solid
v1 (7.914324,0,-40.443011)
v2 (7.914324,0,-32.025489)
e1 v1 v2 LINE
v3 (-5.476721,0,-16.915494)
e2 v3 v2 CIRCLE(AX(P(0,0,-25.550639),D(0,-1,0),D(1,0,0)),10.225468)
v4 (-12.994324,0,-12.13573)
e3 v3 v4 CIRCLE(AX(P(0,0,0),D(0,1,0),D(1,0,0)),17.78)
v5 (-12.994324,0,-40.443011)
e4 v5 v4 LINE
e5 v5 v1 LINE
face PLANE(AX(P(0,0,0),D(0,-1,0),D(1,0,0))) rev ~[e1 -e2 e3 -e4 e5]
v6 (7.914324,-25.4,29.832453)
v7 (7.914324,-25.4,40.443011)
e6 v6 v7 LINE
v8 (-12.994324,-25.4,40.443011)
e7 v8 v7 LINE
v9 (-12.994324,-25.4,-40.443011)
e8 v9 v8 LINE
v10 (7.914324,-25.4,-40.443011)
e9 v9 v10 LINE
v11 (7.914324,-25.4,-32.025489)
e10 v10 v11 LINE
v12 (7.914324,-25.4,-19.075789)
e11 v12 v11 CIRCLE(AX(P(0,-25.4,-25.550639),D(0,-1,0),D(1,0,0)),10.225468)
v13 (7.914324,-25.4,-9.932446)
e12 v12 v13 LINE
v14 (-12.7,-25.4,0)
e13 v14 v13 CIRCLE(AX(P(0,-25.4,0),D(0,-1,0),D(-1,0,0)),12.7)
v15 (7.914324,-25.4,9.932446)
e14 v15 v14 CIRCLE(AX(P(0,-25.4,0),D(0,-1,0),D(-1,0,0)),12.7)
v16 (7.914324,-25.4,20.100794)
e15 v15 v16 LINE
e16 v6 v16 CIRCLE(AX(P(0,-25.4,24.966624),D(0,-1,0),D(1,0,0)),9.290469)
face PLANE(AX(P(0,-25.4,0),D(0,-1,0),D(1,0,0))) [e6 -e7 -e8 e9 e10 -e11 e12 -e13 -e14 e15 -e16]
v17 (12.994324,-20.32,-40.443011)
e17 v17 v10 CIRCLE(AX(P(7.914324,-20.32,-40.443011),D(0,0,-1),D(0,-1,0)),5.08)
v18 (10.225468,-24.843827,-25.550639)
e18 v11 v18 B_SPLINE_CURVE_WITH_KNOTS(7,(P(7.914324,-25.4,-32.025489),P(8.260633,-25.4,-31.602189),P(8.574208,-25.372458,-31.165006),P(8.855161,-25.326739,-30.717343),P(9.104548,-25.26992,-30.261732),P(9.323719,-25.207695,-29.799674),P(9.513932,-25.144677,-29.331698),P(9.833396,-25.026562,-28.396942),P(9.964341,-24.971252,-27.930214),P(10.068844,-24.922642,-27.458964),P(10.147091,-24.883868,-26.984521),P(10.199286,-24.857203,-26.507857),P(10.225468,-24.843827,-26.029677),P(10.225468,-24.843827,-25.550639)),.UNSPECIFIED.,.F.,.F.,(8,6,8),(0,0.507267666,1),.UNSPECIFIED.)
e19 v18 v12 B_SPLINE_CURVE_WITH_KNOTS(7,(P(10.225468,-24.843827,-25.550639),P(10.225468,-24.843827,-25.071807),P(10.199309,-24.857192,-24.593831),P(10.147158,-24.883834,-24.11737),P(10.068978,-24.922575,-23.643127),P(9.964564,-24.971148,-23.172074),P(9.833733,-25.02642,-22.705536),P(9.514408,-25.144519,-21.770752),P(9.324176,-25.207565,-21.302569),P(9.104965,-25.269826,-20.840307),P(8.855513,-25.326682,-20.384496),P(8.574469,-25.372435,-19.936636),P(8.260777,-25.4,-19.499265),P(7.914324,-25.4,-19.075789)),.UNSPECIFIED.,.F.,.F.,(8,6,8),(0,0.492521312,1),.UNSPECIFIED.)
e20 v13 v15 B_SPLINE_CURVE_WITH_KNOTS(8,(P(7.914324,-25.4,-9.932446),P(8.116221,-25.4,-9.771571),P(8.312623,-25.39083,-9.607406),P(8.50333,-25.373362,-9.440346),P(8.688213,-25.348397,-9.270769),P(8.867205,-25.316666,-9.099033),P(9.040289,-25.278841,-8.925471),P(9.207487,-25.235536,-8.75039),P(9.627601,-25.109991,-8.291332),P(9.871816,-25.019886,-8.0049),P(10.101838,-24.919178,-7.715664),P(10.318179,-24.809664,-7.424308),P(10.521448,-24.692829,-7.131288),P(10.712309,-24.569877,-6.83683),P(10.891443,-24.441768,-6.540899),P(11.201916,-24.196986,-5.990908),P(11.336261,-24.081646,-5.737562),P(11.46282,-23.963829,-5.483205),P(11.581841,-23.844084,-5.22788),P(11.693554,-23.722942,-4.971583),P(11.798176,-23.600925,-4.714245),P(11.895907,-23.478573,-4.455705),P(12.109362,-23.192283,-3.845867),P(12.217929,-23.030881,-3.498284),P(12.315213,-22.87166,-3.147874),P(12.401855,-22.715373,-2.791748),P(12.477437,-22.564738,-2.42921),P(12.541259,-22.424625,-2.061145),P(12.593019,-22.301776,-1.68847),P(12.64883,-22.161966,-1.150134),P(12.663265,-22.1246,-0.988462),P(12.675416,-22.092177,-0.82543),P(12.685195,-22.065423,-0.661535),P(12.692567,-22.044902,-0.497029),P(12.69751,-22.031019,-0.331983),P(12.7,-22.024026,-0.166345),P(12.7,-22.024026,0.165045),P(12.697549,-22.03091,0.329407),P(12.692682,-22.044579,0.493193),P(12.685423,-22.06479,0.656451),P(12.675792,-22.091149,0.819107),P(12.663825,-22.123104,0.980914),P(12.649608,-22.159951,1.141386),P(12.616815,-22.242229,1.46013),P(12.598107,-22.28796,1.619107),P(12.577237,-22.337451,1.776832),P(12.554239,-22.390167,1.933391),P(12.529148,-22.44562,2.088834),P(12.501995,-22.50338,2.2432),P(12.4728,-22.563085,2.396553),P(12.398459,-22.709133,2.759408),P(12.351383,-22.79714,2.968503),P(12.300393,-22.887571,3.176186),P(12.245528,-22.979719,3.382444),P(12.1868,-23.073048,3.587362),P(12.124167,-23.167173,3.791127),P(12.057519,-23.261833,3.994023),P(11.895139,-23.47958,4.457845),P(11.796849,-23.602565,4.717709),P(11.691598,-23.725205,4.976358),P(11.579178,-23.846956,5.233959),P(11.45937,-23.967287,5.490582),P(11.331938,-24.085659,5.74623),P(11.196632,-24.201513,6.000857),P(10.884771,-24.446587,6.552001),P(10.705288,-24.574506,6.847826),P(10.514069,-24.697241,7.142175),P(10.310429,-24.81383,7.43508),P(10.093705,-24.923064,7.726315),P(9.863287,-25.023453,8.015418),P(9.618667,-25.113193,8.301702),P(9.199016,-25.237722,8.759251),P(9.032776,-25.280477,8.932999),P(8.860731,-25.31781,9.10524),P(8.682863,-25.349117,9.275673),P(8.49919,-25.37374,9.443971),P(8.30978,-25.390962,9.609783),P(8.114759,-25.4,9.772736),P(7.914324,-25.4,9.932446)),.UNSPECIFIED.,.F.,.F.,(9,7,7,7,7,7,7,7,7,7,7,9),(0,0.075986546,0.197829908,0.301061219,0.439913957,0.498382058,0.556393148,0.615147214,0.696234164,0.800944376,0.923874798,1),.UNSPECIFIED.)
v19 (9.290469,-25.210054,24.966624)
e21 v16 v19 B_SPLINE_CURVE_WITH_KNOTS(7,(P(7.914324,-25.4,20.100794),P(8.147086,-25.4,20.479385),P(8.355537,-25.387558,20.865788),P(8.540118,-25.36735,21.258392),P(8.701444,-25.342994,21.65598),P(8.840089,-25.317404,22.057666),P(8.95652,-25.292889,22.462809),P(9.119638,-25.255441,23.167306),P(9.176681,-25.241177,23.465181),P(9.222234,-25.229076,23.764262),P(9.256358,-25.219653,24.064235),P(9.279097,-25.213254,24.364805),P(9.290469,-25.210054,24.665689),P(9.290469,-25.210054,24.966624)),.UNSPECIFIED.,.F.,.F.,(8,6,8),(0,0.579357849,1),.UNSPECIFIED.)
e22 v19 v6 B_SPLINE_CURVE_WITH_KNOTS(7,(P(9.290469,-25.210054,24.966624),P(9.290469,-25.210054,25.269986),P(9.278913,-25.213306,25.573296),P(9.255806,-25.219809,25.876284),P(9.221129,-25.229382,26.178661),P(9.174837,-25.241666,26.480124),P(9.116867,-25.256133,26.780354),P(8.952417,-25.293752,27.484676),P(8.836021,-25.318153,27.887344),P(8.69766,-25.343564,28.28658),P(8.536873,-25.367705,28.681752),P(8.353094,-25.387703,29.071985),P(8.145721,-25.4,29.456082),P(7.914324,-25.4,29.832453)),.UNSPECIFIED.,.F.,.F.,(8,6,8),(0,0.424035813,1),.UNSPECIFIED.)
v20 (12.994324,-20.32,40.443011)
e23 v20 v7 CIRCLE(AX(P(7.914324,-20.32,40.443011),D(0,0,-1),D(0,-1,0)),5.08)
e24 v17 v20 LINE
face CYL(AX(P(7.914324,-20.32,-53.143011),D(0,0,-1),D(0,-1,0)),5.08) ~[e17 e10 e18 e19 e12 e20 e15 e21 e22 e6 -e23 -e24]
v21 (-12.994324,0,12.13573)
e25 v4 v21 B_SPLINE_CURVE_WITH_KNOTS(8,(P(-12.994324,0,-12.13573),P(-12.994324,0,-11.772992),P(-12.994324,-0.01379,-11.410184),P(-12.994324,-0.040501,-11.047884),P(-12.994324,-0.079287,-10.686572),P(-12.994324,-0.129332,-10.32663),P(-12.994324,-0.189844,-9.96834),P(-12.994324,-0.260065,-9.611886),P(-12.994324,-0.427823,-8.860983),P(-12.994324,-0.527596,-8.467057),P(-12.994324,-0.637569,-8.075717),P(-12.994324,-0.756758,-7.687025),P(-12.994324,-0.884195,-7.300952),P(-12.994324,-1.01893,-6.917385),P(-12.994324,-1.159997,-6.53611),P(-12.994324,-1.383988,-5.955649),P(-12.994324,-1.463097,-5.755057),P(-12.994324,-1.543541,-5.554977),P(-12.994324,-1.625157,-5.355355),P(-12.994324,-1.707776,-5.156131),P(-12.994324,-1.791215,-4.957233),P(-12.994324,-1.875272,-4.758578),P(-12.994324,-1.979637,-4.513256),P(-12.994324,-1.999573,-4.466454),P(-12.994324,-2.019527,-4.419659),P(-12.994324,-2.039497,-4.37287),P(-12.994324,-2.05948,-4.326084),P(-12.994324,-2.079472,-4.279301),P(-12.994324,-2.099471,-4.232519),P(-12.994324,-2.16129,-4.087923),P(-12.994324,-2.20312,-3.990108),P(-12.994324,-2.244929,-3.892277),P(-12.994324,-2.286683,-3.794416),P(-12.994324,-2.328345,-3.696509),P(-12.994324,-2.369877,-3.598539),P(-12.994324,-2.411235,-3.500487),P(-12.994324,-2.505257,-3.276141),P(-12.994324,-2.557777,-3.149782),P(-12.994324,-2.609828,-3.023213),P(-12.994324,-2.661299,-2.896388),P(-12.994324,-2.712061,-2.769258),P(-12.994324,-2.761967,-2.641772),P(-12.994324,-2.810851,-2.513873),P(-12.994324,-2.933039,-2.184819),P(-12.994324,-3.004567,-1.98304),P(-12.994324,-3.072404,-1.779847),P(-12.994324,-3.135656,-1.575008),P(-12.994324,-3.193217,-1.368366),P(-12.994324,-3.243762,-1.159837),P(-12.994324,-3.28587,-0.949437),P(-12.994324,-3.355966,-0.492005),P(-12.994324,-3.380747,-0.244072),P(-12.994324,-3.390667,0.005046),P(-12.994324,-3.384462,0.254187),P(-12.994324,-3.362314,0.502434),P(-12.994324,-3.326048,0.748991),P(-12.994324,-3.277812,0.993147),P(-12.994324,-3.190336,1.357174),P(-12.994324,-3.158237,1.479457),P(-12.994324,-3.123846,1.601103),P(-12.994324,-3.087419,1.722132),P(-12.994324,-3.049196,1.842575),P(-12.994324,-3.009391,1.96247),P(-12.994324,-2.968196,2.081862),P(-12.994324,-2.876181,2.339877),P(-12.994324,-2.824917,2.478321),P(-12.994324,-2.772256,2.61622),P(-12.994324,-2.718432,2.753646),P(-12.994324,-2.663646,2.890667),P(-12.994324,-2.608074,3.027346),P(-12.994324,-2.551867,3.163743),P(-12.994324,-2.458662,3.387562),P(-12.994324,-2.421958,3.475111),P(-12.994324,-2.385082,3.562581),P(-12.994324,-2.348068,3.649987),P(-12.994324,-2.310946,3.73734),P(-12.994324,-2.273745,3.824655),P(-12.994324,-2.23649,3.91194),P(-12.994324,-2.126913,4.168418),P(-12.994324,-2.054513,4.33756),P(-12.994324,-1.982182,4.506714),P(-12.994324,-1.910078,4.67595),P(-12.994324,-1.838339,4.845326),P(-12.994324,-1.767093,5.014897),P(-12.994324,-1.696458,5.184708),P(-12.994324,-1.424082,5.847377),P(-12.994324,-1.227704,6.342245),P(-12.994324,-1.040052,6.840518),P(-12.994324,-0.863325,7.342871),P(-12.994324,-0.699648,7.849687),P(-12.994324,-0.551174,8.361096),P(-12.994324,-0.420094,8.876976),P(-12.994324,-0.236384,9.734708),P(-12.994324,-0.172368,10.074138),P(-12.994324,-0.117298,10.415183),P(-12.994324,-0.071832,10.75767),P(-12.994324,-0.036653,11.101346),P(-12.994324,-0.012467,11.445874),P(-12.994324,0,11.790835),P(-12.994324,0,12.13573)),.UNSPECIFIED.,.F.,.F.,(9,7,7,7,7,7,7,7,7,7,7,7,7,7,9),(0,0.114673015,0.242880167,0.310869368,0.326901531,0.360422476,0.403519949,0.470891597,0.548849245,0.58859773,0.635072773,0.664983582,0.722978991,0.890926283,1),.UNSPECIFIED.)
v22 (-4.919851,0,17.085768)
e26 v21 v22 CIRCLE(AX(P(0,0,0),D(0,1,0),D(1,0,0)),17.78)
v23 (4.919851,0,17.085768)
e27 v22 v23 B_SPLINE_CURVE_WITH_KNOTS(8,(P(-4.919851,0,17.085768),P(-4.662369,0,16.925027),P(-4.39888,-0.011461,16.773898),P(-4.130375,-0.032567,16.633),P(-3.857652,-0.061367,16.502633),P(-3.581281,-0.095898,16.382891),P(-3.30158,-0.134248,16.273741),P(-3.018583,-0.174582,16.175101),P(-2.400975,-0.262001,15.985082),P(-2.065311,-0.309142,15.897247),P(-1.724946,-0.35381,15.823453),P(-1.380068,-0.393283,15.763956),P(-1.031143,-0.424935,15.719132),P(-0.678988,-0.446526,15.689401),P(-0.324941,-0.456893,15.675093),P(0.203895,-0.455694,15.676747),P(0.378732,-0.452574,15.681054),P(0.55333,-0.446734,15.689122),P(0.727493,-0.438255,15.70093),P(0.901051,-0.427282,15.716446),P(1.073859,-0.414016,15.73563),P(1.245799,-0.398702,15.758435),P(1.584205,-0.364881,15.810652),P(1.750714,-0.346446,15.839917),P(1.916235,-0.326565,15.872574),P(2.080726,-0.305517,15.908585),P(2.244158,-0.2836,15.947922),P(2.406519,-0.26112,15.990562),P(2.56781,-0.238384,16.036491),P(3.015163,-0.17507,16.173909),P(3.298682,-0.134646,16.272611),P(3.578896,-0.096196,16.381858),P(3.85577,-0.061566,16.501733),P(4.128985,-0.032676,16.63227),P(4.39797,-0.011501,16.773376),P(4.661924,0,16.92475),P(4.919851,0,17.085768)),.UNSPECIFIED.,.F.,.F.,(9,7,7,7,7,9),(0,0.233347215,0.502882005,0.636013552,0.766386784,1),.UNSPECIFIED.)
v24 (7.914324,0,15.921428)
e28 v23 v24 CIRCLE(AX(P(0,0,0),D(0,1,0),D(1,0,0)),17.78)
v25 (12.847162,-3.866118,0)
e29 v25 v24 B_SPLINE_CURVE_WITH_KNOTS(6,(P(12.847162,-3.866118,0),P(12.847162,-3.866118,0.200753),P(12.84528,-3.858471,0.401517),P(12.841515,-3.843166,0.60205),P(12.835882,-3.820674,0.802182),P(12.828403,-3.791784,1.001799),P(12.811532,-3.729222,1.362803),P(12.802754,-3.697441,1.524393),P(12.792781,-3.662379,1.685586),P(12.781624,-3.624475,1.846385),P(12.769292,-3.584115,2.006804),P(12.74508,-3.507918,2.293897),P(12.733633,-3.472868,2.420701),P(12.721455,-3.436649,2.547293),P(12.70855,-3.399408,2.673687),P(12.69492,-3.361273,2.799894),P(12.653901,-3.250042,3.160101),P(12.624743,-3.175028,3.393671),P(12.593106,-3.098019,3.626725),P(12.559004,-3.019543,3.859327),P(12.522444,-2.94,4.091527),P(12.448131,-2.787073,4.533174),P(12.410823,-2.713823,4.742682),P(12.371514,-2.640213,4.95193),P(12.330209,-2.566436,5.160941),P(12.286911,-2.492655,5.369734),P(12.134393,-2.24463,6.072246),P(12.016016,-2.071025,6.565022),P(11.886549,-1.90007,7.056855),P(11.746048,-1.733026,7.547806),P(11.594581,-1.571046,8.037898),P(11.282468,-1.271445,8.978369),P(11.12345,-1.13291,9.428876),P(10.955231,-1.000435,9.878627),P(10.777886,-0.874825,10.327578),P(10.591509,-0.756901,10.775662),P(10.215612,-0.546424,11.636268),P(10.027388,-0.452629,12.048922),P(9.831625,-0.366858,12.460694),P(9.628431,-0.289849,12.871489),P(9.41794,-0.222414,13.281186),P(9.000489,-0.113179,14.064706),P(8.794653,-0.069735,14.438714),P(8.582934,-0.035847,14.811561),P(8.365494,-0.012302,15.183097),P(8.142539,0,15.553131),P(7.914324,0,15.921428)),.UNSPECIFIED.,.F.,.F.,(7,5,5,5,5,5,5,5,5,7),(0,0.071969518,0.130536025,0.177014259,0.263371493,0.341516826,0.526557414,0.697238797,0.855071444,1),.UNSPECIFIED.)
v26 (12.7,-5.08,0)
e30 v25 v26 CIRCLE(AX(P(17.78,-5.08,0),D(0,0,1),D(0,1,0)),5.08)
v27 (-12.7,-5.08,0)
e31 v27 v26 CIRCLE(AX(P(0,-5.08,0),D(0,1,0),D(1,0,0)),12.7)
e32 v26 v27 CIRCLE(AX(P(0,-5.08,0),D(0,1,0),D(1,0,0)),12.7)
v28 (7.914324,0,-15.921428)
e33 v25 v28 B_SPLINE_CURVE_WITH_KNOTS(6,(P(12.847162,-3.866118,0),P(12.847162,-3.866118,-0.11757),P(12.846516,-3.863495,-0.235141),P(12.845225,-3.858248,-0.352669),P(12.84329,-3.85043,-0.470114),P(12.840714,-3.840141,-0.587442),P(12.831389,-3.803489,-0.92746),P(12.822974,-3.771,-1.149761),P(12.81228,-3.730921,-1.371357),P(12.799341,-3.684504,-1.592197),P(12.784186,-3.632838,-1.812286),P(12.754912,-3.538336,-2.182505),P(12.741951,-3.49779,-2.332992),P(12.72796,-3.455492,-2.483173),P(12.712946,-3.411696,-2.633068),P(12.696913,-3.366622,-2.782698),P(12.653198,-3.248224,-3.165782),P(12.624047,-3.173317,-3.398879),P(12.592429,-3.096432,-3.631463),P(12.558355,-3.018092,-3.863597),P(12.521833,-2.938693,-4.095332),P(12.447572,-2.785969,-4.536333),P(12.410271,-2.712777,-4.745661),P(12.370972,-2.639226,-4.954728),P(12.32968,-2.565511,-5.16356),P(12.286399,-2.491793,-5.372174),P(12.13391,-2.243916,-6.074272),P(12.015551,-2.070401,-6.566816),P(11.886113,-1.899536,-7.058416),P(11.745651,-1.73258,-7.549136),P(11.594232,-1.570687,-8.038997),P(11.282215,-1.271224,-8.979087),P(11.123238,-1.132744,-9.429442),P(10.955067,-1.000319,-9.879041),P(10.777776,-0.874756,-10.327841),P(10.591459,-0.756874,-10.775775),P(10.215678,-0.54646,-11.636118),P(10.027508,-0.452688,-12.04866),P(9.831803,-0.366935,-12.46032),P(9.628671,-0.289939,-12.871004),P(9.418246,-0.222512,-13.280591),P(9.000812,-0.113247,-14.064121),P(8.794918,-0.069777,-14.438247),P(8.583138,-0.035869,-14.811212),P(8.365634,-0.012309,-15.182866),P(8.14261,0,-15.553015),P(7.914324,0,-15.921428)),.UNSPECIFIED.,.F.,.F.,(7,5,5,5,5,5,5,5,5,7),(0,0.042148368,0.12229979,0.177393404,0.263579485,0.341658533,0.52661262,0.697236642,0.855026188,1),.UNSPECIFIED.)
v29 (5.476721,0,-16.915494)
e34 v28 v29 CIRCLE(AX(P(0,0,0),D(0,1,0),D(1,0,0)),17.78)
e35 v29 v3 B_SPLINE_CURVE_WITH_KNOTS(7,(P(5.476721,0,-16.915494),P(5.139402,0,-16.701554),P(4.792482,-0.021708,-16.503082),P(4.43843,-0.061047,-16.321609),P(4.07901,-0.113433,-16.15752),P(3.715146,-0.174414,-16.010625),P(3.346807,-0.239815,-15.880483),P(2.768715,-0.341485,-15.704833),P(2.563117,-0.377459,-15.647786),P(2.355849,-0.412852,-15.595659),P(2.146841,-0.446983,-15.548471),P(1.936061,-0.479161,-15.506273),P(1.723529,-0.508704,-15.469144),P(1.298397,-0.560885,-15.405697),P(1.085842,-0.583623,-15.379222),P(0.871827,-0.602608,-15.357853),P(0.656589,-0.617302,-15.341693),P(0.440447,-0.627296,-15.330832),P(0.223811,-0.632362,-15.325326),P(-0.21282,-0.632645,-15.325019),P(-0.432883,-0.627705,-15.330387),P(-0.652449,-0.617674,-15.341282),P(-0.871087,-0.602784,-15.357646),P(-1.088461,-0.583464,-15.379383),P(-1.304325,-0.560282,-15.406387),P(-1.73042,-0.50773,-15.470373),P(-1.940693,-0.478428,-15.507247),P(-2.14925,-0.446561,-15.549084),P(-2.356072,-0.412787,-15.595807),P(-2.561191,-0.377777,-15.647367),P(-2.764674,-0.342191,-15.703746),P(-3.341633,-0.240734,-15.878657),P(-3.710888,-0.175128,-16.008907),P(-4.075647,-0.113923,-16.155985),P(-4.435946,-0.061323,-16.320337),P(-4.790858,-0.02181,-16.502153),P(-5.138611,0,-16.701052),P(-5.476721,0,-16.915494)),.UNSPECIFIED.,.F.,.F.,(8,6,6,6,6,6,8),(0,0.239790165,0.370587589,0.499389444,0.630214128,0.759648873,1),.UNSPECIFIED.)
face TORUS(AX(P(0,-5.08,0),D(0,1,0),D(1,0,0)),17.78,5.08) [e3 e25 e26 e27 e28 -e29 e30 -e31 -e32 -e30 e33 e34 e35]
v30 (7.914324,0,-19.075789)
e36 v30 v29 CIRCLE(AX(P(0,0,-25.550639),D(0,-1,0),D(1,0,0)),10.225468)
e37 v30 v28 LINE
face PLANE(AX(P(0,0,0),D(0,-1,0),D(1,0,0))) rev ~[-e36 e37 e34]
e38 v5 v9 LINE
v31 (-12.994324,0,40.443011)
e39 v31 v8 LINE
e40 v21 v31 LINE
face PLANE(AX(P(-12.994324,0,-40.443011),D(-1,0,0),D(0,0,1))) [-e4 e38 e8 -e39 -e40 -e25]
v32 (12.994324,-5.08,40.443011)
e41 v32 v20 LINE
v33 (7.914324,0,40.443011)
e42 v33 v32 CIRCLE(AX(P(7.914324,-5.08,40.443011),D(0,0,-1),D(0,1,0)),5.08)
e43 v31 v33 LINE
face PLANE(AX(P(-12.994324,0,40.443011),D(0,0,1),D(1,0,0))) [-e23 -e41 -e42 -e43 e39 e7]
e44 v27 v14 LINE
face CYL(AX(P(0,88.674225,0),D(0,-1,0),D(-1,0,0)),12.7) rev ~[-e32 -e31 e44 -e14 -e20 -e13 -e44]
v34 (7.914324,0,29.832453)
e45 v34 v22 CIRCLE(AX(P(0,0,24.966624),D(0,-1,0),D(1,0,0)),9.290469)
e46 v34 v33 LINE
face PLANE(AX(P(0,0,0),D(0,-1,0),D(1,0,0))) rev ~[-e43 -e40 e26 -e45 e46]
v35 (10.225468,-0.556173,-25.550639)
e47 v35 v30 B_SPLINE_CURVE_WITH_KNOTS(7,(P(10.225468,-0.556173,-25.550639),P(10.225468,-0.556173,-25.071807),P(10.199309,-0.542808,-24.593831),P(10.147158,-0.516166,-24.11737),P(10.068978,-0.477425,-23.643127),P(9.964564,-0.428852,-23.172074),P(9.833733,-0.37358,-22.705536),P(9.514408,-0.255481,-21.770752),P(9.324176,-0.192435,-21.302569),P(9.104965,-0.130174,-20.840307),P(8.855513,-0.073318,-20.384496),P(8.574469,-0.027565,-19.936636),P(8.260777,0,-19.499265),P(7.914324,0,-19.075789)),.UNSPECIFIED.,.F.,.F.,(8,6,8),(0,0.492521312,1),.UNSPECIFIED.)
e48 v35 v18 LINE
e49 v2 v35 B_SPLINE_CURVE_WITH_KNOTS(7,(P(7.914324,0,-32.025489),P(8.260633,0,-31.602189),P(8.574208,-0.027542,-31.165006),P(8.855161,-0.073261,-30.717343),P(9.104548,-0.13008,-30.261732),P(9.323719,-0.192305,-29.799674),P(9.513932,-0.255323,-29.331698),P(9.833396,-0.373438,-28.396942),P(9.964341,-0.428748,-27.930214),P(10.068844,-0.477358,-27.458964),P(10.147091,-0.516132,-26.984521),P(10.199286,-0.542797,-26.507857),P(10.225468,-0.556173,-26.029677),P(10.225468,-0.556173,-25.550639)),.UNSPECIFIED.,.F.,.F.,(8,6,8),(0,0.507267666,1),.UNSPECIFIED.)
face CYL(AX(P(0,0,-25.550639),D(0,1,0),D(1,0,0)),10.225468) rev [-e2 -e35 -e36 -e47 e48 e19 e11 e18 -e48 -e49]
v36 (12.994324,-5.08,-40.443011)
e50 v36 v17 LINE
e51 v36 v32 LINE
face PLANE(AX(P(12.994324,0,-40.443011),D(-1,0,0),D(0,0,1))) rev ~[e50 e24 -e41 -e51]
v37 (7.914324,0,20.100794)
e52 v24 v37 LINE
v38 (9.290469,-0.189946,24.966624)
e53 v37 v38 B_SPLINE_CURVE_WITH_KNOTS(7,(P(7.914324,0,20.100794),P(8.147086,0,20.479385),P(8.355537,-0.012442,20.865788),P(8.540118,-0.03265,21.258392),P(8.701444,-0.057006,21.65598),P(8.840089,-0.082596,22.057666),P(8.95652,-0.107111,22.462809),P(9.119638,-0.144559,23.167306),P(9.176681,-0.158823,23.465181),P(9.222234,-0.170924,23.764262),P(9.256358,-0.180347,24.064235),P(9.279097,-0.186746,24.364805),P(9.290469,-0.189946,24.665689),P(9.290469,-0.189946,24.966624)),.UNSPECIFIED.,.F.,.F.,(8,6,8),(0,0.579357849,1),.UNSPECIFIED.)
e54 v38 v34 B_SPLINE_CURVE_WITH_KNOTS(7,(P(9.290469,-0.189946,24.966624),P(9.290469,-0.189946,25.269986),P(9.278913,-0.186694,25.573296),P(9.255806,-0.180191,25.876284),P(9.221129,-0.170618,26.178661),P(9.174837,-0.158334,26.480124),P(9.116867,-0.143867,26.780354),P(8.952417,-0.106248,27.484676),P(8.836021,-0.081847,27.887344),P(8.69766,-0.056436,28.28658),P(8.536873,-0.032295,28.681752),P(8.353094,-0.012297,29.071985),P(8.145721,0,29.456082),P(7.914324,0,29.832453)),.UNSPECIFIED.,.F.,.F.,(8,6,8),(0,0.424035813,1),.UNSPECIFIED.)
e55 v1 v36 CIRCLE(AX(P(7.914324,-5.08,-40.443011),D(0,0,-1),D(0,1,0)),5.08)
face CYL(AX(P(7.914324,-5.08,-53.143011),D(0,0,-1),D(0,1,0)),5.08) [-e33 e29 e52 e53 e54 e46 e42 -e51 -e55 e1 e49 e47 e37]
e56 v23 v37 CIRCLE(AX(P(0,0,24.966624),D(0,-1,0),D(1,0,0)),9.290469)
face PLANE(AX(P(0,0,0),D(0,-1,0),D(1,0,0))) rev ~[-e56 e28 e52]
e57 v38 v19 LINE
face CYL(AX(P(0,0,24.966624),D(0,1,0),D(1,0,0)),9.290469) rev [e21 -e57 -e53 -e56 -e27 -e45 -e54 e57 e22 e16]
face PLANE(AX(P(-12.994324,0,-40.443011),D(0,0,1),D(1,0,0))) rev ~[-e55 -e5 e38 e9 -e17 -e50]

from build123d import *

# Parameters (mm, degrees)
F2_W        = 25.9886477143
F2_H        = 80.8860212564
F2_R        = 10.2254684018
F2_R_2      = 9.290469056
F3_DEPTH    = 25.4
F4_D        = 25.4
F5_T1_DEPTH = 106.2860212564


# Not quite as in the source:
# - a fillet or chamfer that OpenCascade refuses, or shapes differently, is made with other operations: its cross-section is extruded or revolved along the edge and cut away or added
# - a feature names something its author has since deleted; it is built from what else it names


with BuildPart() as f3:
    # F2 (on face) → F3 (new body)
    with BuildSketch(Plane.XZ):
        Rectangle(F2_W, F2_H)
        with Locations((0, -25.5506392568)):
            Circle(F2_R, mode=Mode.SUBTRACT)
        with Locations((0, 24.9666236341)):
            Circle(F2_R_2, mode=Mode.SUBTRACT)
    extrude(amount=F3_DEPTH)

    # F4 (through all)
    with Locations(Plane(origin=(0, 0, 0), x_dir=(1, 0, 0), z_dir=(0, 1, 0))):
        with Locations((0, 0)):
            Hole(F4_D / 2)

    # F5: fillet of radius 5.08 on 3 edges, made by hand

    # F5_s2 → F5_t1 (cut)
    with BuildSketch(Plane.XY.offset(-53.1430106282)):
        with BuildLine():
            ThreePointArc((7.9143238571, 0), (11.5064263056, -1.4878975516), (12.9943238571, -5.08))
            Line((12.9943238571, -5.08), (12.9943238571, 0))
            Line((12.9943238571, 0), (7.9143238571, 0))
        make_face()
        with BuildLine():
            ThreePointArc((7.9143238571, -25.4), (11.5064263056, -23.9121024484), (12.9943238571, -20.32))
            Line((12.9943238571, -20.32), (12.9943238571, -25.4))
            Line((12.9943238571, -25.4), (7.9143238571, -25.4))
        make_face()
    extrude(amount=F5_T1_DEPTH, mode=Mode.SUBTRACT)

    # F5_s3 → F5_t4 (revolve, cut)
    with BuildSketch(Plane.XY):
        with BuildLine():
            ThreePointArc((17.78, 0), (14.1878975516, -1.4878975516), (12.7, -5.08))
            Line((12.7, -5.08), (12.7, 0))
            Line((12.7, 0), (17.78, 0))
        make_face()
    revolve(axis=Axis((0, 0, 0), (0, 1, 0)), mode=Mode.SUBTRACT)


solid = f3.part
